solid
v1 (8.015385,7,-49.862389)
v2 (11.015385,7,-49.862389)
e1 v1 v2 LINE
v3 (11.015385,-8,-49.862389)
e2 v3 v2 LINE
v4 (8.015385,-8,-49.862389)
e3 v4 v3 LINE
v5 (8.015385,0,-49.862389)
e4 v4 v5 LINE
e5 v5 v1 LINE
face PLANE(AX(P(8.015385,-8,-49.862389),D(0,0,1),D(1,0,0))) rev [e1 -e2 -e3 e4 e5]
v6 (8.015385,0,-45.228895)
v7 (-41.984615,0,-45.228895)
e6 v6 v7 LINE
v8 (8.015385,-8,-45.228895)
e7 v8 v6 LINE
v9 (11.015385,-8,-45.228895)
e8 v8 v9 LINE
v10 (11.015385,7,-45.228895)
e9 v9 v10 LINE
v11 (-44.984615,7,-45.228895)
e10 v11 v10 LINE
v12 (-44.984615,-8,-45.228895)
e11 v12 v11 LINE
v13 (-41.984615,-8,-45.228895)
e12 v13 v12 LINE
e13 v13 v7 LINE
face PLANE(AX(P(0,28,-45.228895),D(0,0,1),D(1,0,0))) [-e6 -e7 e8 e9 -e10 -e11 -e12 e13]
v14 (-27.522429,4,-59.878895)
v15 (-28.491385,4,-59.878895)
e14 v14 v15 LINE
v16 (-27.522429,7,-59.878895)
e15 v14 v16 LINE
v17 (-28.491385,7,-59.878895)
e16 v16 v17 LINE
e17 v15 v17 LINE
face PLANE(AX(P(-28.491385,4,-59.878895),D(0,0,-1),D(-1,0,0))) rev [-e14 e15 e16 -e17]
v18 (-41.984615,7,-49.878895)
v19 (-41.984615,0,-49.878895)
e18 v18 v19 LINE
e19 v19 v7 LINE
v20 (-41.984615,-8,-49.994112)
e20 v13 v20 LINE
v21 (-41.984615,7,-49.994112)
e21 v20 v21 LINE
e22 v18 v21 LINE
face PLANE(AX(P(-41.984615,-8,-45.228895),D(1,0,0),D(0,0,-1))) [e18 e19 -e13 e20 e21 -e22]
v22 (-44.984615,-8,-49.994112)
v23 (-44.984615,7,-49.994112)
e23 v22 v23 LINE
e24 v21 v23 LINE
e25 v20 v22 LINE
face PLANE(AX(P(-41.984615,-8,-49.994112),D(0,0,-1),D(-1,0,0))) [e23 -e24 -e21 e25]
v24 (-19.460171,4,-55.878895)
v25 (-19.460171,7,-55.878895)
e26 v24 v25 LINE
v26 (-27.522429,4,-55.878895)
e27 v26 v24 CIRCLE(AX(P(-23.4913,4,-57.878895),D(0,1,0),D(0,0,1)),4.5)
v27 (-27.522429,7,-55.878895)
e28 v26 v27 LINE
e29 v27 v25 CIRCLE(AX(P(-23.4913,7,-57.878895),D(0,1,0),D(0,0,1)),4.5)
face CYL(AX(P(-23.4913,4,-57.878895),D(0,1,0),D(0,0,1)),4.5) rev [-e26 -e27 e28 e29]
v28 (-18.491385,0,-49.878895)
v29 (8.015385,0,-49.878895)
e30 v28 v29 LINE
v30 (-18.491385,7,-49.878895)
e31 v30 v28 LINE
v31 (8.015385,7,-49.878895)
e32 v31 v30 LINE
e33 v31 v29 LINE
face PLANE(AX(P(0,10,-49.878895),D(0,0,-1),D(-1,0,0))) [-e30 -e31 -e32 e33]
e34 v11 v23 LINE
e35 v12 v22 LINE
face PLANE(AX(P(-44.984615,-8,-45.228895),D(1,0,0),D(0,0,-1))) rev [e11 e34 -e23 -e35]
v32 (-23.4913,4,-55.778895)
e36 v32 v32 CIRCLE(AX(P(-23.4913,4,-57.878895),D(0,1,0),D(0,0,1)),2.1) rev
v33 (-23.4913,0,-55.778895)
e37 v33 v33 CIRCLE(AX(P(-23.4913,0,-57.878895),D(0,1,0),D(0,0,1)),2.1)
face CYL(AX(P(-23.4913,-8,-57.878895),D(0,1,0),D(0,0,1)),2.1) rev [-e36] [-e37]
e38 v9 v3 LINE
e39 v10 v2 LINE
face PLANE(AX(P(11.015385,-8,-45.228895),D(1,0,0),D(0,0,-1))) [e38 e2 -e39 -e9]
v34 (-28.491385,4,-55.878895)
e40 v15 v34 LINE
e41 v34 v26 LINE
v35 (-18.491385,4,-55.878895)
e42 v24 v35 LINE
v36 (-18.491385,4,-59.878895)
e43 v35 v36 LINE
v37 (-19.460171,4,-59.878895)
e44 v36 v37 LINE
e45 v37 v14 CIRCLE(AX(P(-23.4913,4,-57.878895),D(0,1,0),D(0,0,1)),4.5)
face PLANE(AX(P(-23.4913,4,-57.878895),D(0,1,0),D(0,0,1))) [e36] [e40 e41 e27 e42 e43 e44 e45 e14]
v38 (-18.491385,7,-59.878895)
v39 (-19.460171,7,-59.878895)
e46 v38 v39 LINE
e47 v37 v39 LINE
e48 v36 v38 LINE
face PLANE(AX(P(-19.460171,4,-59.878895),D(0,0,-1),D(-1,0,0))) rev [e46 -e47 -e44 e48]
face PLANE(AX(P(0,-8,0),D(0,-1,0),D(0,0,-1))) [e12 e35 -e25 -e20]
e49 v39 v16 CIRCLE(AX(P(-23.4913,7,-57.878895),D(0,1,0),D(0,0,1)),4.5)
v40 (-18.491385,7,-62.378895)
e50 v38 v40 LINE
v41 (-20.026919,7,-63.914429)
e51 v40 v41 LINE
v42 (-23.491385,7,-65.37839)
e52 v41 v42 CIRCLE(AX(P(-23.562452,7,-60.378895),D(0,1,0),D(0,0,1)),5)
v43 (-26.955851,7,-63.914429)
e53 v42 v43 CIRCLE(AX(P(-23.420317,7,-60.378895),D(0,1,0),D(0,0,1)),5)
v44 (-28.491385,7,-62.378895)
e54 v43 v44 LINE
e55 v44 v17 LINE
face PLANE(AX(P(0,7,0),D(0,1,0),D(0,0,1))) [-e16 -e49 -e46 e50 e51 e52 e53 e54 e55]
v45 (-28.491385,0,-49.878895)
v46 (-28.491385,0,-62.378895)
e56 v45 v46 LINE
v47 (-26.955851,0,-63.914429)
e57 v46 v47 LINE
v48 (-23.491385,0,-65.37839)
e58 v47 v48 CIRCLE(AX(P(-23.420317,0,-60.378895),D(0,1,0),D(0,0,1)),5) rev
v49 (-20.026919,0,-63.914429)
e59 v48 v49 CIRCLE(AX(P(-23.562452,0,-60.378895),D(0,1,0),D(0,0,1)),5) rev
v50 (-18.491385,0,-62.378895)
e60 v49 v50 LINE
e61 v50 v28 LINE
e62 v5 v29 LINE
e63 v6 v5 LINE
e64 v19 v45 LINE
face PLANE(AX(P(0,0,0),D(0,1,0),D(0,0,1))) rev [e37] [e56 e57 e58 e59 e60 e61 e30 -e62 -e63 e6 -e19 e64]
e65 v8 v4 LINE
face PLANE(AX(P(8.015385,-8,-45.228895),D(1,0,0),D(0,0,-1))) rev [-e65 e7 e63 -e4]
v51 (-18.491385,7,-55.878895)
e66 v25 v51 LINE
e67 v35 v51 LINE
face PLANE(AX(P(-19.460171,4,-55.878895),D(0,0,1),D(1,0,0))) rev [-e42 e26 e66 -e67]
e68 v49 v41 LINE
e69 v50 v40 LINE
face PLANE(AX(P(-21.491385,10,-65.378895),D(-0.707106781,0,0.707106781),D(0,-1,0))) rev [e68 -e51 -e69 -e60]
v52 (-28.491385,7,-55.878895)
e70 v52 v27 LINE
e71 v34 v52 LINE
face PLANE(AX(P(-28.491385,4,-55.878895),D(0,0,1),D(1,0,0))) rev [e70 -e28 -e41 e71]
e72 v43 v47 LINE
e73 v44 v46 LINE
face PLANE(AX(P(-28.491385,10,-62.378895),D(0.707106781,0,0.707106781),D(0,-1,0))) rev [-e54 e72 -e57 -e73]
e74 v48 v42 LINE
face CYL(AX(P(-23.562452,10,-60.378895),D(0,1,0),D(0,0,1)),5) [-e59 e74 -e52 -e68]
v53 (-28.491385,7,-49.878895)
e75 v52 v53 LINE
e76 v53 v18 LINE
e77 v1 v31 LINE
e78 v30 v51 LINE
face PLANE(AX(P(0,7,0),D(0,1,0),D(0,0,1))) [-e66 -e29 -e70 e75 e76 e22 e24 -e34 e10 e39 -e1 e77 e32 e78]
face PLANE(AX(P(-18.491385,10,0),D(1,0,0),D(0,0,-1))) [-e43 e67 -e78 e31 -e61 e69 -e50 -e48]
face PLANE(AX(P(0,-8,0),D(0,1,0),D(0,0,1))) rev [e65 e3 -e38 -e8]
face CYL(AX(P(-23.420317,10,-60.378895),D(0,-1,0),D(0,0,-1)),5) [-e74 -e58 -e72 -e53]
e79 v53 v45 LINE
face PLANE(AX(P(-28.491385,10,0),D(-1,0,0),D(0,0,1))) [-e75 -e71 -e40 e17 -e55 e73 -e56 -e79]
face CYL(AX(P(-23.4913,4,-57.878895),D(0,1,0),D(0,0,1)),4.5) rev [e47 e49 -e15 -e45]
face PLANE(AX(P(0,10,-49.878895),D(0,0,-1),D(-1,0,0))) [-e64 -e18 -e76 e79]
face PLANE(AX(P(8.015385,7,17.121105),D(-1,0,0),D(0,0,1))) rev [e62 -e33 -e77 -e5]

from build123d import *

# Parameters (mm, degrees)
SKETCH1_W           = 50
SKETCH1_H           = 100
BOSS_EXTRUDE1_DEPTH = 7
CUT_EXTRUDE1_DEPTH  = 10
CUT_EXTRUDE2_DEPTH  = 28
SKETCH5_W           = 3
SKETCH5_H           = 4.633494333
SKETCH5_H_2         = 4.765216978
BOSS_EXTRUDE2_DEPTH = 15
SKETCH6_R           = 2.1
CUT_EXTRUDE3_DEPTH  = 15
CHAMFER1_SIZE       = 3
CUT_EXTRUDE4_DEPTH  = 3
FILLET1_R           = 5
SKETCH8_W           = 66.498468349
SKETCH8_H           = 65.695900627
CUT_EXTRUDE5_DEPTH  = 29


with BuildPart() as part:
    # Sketch1 → Boss-Extrude1 (new body)
    with BuildSketch(Plane(origin=(0, 0, 0), x_dir=(1, 0, 0), z_dir=(0, 1, 0))):
        with Locations((-16.984615004, 32.878894954)):
            Rectangle(SKETCH1_W, SKETCH1_H)
    extrude(amount=BOSS_EXTRUDE1_DEPTH)

    # Sketch2 → Cut-Extrude1 (cut)
    with BuildSketch(Plane.XZ):
        Polygon((8.015384996, -49.878894954), (6.015384996, -49.878894954), (-18.491384598, -49.878894954), (-18.491384598, -50.378894954), (-18.491384598, -65.378894954), (-28.491384598, -65.378894954), (-28.491384598, -50.378894954), (-28.491384598, -49.878894954), (-39.984615004, -49.878894954), (-41.984615004, -49.878894954), (-41.984615004, -82.878894954), (8.015384996, -82.878894954), align=None)
    extrude(amount=-CUT_EXTRUDE1_DEPTH, mode=Mode.SUBTRACT)

    # Sketch4 → Cut-Extrude2 (cut)
    with BuildSketch(Plane.XZ):
        Polygon((8.015384996, -42.228894954), (-0.484615004, -42.228894954), (-33.484615004, -42.228894954), (-41.984615004, -42.228894954), (-41.984615004, -45.228894954), (-33.484615004, -45.228894954), (-0.484615004, -45.228894954), (8.015384996, -45.228894954), align=None)
    extrude(amount=-CUT_EXTRUDE2_DEPTH, mode=Mode.SUBTRACT)


with BuildPart() as cut_extrude2_piece_1:
    # of the separate pieces the step leaves, piece 1, a body of its own (cut_extrude2_pieces)
    add(part.part.solids().sort_by_distance((8.015384996, 0, 17.121105046))[0])

    # Sketch8 → Cut-Extrude5 (cut)
    with BuildSketch(Plane(origin=(0, 7, 0), x_dir=(1, 0, 0), z_dir=(0, 1, 0))):
        with Locations((-10.449420701, 11.294291779)):
            Rectangle(SKETCH8_W, SKETCH8_H)
    extrude(amount=-CUT_EXTRUDE5_DEPTH, mode=Mode.SUBTRACT)


with BuildPart() as cut_extrude2_piece_2:
    # of the separate pieces the step leaves, piece 2, a body of its own (cut_extrude2_pieces)
    add(part.part.solids().sort_by_distance((8.015384996, 0, -49.878894954))[0])

    # Sketch5 → Boss-Extrude2 (add)
    with BuildSketch(Plane(origin=(0, 7, 0), x_dir=(1, 0, 0), z_dir=(0, 1, 0))):
        with Locations((9.515384996, 47.545642121)):
            Rectangle(SKETCH5_W, SKETCH5_H)
        with Locations((-43.484615004, 47.611503443)):
            Rectangle(SKETCH5_W, SKETCH5_H_2)
    extrude(amount=-BOSS_EXTRUDE2_DEPTH)

    # Sketch6 → Cut-Extrude3 (cut)
    with BuildSketch(Plane(origin=(0, 7, 0), x_dir=(1, 0, 0), z_dir=(0, 1, 0))):
        with Locations(Location((-23.491299754, 57.878894954, 0), (0, 0, 270))):
            Circle(SKETCH6_R)
    extrude(amount=-CUT_EXTRUDE3_DEPTH, mode=Mode.SUBTRACT)

    # Chamfer1
    chamfer1_edges = [cut_extrude2_piece_2.edges().sort_by_distance(p)[0] for p in [
        (-28.491384598, 3.5, -65.378894954),
        (-18.491384598, 3.5, -65.378894954),
    ]]
    chamfer(chamfer1_edges, length=CHAMFER1_SIZE)

    # Sketch7 → Cut-Extrude4 (cut)
    with BuildSketch(Plane(origin=(0, 7, 0), x_dir=(1, 0, 0), z_dir=(0, 1, 0))):
        with BuildLine():
            Line((-28.491384598, 55.878894954), (-27.522428628, 55.878894954))
            ThreePointArc((-27.522428628, 55.878894954), (-23.491299754, 53.378894954), (-19.46017088, 55.878894954))
            Line((-19.46017088, 55.878894954), (-18.491384598, 55.878894954))
            Line((-18.491384598, 55.878894954), (-18.491384598, 59.878894954))
            Line((-18.491384598, 59.878894954), (-19.46017088, 59.878894954))
            ThreePointArc((-19.46017088, 59.878894954), (-23.491299754, 62.378894954), (-27.522428628, 59.878894954))
            Line((-27.522428628, 59.878894954), (-28.491384598, 59.878894954))
            Line((-28.491384598, 59.878894954), (-28.491384598, 55.878894954))
        make_face()
    extrude(amount=-CUT_EXTRUDE4_DEPTH, mode=Mode.SUBTRACT)

    # Fillet1
    # the kernel refuses this fillet: 5 mm, written as the material it takes off along each edge
    with BuildSketch(Plane(origin=(-21.491384598, -5.17766953, -65.378894954), x_dir=(0.7071067811865483, 0, 0.7071067811865466), z_dir=(0, 1, 0)), Plane(origin=(-25.491384598, -5.17766953, -65.378894954), x_dir=(1, 0, 0), z_dir=(0, 1, 0))) as fillet1_piece_1:
        with BuildLine():
            CenterArc((FILLET1_R * 0.414213562373, -FILLET1_R), FILLET1_R, 90, 45)
            Line((-FILLET1_R * 0.292893218813, -FILLET1_R * 0.292893218813), (0, 0))
            Line((0, 0), (FILLET1_R * 0.414213562373, 0))
        make_face()
    extrude(amount=17.355339059, mode=Mode.SUBTRACT)


solid = cut_extrude2_piece_2.part
